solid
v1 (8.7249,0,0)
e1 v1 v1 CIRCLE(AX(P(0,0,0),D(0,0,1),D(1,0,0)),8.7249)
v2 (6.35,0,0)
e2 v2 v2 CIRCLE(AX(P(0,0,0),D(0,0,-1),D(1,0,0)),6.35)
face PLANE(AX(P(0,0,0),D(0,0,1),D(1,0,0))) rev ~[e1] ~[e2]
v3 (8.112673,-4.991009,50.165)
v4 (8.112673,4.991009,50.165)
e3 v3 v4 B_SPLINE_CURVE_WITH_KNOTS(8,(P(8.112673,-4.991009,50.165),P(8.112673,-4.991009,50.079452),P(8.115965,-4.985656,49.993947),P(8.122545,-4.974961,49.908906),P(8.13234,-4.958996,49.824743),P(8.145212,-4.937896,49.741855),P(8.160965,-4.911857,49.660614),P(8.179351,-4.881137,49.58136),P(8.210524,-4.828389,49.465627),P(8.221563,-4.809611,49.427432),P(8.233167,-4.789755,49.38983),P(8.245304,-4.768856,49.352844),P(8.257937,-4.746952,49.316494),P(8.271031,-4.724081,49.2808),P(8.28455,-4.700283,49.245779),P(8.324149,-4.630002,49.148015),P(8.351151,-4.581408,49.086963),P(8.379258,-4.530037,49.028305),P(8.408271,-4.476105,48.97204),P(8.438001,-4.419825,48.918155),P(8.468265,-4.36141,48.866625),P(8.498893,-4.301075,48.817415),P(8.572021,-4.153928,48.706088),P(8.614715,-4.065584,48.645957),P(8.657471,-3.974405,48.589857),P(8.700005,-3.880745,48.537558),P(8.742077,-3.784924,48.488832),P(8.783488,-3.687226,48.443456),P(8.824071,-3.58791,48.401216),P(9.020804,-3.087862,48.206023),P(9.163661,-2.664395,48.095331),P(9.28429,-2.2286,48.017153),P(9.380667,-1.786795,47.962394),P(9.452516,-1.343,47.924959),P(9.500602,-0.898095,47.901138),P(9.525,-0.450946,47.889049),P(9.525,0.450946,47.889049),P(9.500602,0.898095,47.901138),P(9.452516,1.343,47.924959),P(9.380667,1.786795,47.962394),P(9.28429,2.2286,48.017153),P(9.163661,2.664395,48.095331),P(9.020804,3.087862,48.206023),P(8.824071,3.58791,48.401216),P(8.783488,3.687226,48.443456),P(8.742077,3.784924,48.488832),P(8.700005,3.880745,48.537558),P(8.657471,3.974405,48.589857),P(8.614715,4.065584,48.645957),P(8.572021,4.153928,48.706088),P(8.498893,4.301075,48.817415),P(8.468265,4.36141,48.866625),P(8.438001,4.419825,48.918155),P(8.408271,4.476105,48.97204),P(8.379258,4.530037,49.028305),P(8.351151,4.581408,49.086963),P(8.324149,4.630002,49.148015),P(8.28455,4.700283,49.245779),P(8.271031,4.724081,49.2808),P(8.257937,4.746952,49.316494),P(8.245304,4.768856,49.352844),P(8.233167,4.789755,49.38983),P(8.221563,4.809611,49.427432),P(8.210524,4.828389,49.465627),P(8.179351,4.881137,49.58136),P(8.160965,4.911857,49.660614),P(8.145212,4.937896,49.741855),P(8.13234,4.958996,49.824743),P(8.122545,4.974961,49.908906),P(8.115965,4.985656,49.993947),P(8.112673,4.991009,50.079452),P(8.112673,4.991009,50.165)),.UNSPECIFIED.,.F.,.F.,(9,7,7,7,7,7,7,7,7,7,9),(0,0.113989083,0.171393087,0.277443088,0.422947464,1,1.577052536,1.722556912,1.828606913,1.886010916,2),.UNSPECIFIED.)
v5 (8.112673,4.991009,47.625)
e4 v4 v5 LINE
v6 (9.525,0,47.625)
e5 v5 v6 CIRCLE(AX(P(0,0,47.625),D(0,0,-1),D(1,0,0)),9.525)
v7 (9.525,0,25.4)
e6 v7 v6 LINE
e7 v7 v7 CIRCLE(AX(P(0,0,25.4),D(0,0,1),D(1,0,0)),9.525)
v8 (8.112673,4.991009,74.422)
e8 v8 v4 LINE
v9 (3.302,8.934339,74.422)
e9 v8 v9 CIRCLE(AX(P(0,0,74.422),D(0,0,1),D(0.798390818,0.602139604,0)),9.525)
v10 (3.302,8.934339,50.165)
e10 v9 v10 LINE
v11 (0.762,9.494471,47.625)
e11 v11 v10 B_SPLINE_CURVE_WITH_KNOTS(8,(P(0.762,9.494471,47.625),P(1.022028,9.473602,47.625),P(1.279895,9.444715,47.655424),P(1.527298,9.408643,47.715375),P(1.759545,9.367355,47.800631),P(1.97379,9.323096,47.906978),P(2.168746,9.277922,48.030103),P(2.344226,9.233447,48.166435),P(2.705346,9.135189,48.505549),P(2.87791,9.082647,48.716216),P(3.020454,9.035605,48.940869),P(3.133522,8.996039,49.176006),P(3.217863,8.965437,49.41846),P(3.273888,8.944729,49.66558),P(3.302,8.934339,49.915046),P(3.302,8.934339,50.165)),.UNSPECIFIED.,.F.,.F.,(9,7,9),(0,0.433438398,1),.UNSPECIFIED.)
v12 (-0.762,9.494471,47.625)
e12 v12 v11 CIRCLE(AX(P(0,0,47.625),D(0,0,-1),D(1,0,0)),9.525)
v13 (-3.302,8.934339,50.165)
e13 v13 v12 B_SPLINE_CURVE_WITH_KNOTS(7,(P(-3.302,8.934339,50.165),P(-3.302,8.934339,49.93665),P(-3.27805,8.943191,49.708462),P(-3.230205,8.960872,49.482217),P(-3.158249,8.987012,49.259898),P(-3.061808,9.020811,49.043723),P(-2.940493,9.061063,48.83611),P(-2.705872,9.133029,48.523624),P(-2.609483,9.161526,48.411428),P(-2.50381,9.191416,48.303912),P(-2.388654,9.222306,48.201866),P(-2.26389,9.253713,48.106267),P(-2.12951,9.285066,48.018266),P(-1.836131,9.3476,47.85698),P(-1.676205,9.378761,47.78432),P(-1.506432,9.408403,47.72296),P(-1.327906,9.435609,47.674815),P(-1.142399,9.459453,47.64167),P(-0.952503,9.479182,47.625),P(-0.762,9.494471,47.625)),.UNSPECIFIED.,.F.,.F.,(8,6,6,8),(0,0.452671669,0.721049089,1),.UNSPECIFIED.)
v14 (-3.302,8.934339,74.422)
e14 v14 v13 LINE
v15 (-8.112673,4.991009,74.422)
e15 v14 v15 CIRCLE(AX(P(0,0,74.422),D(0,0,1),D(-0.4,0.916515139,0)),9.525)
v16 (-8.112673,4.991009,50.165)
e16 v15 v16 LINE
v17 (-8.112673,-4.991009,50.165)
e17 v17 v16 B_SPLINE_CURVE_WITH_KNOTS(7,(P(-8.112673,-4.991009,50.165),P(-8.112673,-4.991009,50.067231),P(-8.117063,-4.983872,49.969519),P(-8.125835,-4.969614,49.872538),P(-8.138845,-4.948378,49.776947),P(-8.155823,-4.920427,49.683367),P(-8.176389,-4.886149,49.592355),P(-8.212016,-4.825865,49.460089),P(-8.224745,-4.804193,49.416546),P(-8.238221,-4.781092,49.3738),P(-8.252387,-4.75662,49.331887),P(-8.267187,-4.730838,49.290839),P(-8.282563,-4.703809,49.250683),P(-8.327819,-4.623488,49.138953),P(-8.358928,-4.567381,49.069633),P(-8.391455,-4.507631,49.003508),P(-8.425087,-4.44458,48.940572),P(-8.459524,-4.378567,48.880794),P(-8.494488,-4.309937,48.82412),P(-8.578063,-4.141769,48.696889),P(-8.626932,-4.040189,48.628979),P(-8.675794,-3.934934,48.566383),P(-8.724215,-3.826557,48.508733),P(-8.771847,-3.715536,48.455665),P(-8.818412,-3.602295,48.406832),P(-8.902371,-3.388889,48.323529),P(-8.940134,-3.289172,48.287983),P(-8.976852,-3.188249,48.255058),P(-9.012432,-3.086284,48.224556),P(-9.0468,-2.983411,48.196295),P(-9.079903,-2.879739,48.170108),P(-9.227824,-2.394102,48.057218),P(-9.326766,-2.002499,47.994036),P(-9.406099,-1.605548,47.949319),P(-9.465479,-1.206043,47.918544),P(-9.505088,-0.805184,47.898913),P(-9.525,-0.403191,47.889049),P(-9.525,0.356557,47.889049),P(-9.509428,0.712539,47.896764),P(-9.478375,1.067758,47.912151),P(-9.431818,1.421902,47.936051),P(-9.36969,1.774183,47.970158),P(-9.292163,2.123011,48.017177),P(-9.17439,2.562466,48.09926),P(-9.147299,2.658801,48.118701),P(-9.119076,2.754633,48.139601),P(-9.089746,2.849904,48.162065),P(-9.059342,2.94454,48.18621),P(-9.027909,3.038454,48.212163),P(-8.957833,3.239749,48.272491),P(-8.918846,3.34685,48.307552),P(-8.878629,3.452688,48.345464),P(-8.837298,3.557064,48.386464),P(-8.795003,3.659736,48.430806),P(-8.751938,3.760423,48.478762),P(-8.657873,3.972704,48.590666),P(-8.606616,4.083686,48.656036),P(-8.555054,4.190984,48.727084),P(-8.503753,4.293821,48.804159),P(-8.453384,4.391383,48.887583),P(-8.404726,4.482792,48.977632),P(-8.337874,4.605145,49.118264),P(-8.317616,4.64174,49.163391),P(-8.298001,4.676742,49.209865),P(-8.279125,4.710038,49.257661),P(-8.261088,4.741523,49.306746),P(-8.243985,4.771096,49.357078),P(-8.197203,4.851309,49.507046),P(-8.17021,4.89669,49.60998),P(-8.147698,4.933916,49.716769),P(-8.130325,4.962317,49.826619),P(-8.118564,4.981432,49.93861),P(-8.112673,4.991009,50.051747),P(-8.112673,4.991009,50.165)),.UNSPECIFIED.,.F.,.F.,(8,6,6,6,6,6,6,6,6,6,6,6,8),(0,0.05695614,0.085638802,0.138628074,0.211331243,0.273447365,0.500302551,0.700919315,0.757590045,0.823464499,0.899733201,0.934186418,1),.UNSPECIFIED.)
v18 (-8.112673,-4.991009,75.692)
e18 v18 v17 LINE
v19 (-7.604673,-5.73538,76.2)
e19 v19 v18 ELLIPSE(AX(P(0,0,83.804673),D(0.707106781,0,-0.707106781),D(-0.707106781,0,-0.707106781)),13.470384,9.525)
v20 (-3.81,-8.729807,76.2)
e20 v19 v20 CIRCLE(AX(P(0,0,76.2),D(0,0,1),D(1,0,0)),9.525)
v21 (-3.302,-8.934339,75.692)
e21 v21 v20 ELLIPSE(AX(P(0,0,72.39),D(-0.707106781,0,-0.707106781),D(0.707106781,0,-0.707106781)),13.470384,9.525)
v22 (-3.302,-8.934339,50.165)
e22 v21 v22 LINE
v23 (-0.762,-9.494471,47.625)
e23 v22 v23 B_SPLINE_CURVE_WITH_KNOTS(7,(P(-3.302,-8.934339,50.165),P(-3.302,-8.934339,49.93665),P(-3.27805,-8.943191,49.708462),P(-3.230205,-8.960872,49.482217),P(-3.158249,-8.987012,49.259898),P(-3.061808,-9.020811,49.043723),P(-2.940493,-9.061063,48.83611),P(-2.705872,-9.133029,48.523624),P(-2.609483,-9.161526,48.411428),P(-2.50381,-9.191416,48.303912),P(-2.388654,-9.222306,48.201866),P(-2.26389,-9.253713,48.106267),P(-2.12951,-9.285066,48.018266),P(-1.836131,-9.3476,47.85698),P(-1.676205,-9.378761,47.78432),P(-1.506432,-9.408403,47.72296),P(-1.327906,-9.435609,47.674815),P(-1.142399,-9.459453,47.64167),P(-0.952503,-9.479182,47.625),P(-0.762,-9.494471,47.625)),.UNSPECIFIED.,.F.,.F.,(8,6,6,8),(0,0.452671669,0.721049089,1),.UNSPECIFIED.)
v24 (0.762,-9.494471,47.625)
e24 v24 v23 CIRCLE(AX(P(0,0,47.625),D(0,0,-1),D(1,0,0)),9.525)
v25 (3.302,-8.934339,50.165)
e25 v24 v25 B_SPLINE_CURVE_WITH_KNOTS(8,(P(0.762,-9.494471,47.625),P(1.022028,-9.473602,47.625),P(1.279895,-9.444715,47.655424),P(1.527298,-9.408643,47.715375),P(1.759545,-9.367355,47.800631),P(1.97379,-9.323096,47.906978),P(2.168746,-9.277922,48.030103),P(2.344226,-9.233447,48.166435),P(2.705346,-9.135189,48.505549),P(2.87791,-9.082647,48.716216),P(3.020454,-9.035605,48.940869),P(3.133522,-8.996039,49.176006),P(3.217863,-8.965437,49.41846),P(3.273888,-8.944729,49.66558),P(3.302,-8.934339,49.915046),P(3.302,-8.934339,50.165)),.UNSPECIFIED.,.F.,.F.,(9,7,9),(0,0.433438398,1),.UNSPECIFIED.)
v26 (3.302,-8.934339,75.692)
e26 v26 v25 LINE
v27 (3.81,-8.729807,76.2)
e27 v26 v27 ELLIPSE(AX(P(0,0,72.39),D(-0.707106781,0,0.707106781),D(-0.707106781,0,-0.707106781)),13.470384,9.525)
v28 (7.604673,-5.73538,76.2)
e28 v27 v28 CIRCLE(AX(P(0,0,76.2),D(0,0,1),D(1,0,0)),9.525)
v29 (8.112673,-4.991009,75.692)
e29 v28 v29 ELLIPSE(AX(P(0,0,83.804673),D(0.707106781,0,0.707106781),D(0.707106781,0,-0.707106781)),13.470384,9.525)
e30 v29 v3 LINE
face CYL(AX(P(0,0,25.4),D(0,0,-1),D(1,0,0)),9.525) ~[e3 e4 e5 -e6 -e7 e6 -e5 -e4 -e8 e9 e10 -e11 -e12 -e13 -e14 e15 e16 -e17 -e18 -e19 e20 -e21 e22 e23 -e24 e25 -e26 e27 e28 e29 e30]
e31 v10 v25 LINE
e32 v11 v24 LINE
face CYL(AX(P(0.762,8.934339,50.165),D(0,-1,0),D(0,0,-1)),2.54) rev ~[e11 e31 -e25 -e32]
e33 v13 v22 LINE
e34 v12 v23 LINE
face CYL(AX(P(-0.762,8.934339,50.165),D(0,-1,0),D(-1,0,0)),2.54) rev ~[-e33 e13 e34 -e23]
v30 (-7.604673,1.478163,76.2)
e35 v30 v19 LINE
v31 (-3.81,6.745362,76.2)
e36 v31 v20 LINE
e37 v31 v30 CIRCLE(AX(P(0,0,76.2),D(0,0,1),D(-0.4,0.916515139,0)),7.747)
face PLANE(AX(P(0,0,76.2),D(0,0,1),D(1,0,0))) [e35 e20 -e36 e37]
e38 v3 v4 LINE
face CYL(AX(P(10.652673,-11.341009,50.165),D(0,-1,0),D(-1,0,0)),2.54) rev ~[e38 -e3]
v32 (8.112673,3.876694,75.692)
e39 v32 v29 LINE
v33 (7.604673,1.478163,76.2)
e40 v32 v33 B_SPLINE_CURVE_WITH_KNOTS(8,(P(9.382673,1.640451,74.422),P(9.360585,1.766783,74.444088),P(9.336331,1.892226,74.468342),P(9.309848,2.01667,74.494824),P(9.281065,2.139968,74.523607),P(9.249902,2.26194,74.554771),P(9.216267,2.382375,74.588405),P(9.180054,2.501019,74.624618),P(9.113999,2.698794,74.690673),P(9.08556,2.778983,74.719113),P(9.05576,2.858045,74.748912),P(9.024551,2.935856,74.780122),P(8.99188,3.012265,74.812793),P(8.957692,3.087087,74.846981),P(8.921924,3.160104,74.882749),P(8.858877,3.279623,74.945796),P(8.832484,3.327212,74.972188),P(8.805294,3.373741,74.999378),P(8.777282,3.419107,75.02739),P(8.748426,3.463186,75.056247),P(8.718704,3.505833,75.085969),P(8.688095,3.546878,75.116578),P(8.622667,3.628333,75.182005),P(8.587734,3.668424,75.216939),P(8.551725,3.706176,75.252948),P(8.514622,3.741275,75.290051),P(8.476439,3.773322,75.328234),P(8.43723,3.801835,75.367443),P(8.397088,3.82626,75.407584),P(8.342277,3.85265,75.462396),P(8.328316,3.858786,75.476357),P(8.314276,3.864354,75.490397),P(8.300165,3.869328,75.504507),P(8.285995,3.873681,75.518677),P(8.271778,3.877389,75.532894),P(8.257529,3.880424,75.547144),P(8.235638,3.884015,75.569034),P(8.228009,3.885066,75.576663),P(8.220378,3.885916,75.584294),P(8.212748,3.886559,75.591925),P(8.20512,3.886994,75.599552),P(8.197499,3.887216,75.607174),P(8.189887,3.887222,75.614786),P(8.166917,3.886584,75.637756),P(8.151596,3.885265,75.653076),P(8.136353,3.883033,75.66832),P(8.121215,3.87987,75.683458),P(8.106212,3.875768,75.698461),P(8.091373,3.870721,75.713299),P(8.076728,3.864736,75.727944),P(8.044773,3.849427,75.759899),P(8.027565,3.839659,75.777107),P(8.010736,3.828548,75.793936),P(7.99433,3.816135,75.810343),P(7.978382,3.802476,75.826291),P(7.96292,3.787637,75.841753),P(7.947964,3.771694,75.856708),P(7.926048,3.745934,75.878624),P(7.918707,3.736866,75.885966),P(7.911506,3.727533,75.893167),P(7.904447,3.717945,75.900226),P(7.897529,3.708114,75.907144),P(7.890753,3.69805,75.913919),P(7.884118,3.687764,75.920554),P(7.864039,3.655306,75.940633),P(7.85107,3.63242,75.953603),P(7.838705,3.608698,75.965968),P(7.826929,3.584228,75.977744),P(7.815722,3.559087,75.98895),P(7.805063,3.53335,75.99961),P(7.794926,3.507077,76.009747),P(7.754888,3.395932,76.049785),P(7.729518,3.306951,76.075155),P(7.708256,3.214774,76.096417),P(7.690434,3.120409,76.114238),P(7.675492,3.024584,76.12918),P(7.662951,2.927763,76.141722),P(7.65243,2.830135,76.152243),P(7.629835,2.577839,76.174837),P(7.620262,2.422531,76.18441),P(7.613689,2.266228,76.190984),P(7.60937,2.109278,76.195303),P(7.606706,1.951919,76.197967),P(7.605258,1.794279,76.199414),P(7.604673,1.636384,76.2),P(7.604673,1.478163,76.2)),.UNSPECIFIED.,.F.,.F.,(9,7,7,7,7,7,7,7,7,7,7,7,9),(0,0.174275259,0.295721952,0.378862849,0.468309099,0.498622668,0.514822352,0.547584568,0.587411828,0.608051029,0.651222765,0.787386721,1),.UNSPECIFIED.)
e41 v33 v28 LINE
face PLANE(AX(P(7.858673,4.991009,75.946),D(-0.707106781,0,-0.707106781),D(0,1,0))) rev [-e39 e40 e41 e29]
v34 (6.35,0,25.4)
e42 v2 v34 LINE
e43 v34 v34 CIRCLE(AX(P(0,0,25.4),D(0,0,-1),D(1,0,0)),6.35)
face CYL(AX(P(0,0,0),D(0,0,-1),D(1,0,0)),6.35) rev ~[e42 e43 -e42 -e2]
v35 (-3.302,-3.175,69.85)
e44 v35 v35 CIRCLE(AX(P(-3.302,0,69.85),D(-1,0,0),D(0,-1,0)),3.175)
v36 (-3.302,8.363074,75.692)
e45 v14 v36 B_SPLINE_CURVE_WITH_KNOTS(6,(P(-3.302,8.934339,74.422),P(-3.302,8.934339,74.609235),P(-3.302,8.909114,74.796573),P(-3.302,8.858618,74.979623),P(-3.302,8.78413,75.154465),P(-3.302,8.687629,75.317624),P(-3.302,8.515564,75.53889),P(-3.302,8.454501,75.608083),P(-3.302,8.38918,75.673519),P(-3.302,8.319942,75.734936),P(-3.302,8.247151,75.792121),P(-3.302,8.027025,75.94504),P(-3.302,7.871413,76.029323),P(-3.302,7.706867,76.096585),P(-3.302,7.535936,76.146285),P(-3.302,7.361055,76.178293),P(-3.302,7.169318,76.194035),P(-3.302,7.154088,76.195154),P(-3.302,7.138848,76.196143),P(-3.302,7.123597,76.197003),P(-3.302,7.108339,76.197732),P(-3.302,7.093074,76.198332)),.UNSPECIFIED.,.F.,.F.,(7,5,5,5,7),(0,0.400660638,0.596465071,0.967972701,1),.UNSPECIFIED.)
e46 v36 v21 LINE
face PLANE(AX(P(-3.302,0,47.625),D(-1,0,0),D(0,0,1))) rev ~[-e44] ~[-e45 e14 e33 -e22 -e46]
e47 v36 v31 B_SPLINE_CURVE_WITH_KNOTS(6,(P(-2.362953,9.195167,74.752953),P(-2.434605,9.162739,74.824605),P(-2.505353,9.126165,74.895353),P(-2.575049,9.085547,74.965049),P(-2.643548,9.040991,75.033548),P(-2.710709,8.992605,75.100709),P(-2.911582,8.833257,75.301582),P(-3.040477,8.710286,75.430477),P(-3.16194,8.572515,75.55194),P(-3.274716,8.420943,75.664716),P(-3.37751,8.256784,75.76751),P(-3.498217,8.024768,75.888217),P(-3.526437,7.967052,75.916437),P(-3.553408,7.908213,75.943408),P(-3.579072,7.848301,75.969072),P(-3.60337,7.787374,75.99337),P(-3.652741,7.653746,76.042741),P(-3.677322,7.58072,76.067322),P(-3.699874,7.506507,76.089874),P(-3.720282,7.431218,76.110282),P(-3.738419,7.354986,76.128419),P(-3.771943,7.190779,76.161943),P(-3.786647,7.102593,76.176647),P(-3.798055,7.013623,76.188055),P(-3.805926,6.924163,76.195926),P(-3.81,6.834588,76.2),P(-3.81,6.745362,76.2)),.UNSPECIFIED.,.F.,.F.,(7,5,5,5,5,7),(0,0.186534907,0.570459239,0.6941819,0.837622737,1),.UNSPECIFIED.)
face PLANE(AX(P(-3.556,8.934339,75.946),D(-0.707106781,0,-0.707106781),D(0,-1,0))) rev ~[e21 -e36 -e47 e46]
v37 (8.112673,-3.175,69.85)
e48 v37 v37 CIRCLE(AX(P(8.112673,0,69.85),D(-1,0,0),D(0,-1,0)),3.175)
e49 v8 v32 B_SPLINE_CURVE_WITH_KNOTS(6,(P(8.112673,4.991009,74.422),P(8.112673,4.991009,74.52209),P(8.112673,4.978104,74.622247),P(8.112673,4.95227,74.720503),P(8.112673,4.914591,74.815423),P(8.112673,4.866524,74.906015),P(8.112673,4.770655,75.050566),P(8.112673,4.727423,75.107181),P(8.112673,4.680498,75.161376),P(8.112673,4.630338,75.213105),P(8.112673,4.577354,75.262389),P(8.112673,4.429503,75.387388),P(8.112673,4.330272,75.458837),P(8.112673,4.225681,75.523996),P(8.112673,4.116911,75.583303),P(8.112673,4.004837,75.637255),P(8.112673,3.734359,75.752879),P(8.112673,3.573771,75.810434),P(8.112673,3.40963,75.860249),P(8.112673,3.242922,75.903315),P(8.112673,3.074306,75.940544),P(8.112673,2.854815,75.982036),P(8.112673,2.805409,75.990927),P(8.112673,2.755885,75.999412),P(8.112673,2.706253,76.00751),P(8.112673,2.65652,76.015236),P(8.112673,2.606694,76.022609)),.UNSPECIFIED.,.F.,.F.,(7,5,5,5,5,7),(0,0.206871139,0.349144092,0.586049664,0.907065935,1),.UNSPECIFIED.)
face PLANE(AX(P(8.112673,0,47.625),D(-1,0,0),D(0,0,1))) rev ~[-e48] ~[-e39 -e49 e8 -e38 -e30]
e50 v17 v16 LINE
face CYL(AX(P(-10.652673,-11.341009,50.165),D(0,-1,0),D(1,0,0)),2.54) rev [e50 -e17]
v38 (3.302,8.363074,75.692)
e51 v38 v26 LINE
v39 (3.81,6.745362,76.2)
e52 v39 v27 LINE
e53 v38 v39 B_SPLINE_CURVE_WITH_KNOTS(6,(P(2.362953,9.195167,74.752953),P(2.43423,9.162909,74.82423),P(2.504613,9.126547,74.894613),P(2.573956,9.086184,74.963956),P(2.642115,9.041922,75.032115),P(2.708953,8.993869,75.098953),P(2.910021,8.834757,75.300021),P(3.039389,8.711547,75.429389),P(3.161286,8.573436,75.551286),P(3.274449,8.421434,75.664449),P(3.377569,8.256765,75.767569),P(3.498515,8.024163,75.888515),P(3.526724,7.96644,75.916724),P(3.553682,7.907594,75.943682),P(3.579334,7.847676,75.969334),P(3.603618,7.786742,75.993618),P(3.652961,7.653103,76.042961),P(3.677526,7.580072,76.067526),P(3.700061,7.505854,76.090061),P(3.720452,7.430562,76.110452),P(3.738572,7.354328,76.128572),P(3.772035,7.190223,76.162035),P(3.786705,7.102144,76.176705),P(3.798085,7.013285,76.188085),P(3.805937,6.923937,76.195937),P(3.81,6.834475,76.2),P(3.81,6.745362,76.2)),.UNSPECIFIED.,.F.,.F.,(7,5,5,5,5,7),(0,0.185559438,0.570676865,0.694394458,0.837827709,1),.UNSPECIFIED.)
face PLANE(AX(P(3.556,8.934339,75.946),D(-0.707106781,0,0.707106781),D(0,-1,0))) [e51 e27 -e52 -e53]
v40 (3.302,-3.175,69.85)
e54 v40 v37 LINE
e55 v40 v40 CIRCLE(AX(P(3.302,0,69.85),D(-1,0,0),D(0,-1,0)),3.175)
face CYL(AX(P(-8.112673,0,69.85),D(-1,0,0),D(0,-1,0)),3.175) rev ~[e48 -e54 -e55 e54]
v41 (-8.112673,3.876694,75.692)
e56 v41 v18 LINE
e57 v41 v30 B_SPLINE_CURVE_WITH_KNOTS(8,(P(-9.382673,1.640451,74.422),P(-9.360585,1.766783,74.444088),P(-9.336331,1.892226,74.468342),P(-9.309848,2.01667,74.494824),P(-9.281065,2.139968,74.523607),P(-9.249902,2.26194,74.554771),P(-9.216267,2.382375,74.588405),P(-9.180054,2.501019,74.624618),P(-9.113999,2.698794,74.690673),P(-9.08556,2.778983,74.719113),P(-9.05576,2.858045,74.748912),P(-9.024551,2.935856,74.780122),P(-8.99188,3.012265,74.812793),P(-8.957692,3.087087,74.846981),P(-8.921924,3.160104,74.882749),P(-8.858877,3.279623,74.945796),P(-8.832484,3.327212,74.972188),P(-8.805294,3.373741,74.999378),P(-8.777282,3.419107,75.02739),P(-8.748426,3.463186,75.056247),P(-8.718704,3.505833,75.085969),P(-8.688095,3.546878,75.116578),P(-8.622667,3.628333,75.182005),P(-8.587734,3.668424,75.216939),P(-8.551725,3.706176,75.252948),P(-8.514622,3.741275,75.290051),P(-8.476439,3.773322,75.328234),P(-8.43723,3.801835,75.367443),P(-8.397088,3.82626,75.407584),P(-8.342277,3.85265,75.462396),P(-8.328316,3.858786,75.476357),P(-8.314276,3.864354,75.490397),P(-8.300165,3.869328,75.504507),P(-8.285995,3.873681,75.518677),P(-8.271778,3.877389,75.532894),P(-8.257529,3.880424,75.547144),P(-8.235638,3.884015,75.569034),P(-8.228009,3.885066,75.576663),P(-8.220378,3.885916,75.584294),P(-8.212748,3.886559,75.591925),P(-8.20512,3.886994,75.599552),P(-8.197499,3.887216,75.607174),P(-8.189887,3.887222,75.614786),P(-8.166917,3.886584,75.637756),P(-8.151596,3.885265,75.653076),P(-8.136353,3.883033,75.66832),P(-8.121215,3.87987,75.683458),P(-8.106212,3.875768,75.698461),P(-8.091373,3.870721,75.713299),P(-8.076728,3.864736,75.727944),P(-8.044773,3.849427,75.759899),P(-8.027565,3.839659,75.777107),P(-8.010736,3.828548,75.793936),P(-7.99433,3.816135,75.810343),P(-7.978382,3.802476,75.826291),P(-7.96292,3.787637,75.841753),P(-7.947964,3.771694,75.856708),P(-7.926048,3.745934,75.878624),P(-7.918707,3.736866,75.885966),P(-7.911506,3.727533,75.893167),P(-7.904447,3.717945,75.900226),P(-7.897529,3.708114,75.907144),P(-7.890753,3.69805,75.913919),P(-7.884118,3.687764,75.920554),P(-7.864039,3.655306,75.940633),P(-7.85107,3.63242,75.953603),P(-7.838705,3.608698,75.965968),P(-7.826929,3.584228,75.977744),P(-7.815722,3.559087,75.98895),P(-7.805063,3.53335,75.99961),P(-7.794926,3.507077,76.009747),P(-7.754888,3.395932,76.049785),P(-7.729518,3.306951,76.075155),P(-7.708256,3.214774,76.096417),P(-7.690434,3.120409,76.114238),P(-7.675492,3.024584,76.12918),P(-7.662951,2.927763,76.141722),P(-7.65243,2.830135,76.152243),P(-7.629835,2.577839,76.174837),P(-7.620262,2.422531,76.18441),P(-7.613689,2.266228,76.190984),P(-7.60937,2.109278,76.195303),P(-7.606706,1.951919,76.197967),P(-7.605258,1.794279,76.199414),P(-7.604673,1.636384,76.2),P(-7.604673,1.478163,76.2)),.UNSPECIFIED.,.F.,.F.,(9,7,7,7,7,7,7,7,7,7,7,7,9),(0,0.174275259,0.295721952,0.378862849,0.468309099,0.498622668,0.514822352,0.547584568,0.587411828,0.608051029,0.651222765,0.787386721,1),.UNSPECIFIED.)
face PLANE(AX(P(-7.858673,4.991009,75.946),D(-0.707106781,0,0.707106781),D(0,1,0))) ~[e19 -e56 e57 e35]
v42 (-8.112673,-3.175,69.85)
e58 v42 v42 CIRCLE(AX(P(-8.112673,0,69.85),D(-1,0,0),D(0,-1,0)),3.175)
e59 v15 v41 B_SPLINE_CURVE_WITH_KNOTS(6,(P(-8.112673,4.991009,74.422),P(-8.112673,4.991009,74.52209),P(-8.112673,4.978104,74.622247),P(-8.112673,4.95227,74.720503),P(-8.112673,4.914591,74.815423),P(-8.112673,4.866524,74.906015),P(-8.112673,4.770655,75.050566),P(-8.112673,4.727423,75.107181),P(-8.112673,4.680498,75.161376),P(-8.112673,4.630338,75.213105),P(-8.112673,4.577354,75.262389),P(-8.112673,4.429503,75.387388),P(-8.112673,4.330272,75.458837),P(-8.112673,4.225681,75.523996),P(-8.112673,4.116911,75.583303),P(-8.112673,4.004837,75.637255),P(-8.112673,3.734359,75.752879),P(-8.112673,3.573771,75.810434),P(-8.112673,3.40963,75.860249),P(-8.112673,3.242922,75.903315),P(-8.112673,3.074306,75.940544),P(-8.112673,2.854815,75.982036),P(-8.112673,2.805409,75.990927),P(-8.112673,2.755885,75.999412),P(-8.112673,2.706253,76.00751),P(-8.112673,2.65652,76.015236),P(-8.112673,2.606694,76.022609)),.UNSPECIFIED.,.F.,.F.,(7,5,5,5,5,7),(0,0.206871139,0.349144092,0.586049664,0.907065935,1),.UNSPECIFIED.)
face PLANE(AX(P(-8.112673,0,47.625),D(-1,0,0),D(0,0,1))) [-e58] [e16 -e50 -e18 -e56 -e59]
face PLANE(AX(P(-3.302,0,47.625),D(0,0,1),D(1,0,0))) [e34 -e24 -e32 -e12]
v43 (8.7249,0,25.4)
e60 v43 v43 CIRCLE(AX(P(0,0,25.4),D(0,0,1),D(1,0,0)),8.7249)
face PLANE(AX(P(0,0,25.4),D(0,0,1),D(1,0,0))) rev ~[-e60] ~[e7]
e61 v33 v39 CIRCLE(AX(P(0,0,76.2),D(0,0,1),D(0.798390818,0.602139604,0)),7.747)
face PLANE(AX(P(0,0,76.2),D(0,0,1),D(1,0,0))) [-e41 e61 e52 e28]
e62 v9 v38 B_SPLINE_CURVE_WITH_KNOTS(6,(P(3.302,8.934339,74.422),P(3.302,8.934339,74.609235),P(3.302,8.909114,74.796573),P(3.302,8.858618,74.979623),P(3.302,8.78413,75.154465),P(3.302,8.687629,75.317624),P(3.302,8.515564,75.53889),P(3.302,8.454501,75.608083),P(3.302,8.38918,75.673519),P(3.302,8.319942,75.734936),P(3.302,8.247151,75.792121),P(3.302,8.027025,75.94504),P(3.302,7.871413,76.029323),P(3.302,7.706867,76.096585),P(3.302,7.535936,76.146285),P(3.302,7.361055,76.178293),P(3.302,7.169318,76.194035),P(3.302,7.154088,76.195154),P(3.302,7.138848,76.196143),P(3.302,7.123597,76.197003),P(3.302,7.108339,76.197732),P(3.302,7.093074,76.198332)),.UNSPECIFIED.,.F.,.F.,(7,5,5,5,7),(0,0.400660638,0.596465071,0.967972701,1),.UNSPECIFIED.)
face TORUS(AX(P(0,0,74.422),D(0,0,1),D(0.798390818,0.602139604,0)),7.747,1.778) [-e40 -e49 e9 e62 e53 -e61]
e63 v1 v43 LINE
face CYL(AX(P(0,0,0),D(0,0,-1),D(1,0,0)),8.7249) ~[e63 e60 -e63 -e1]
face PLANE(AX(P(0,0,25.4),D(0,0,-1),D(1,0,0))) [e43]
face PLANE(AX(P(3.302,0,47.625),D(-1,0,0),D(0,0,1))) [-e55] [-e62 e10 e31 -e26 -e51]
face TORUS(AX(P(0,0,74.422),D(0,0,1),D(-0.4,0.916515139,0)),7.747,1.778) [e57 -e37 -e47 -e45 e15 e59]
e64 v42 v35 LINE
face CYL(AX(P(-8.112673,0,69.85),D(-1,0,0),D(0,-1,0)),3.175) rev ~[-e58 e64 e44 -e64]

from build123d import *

# Parameters (mm, degrees)
F0_R           = 8.7249
F1_DEPTH       = 25.4
F2_R           = 9.525
F3_DEPTH       = 50.8
F4_W           = 6.604
F4_H           = 31.75
F4_W_2         = 7.7840778498
F4_H_2         = 37.4901928008
F5_DEPTH       = 25.4
F5_DEPTH_BACK  = 25.4
F6_R           = 2.54
F7_SIZE        = 0.508
F8_T4_DEPTH    = 22.6820176921
F8_S5_R        = 9.525
F8_T6_DEPTH    = 13
F8_T10_DEPTH   = 22.6820176921
F8_S11_R       = 9.525
F8_T12_DEPTH   = 13
F9_R           = 3.175
F10_DEPTH      = 25.4
F10_DEPTH_BACK = 25.4
F11_R          = 1.778
F12_R          = 6.35
F13_DEPTH      = 25.4


# Not quite as in the source:
# - a fillet or chamfer that OpenCascade refuses, or shapes differently, is made with other operations: its cross-section is extruded or revolved along the edge and cut away or added


with BuildPart() as f1:
    # F0 (on Top) → F1 (new body)
    with BuildSketch(Plane.XY):
        Circle(F0_R)
    extrude(amount=F1_DEPTH)

    # F2 (on face) → F3 (join)
    with BuildSketch(Plane.XY.offset(25.4)):
        Circle(F2_R)
    extrude(amount=F3_DEPTH)

    # F4 (on Front) → F5 (cut, two sides)
    with BuildSketch(Plane.XZ) as f5_sk:
        with Locations((0, 63.5)):
            Rectangle(F4_W, F4_H)
        with Locations((12.0047114623, 66.3700964004)):
            Rectangle(F4_W_2, F4_H_2)
        with Locations((-12.0047114623, 66.3700964004)):
            Rectangle(F4_W_2, F4_H_2)
    extrude(amount=-F5_DEPTH, mode=Mode.SUBTRACT)
    extrude(f5_sk.sketch, amount=F5_DEPTH_BACK, mode=Mode.SUBTRACT)

    # F6
    f6_edges = [f1.edges().sort_by_distance(p)[0] for p in [
        (-3.302, 0, 47.625),
        (3.302, 0, 47.625),
    ]]
    fillet(f6_edges, radius=F6_R)

    # F7
    f7_edges = [f1.edges().sort_by_distance(p)[0] for p in [
        (3.302, 0, 76.2),
        (-3.302, 0, 76.2),
        (-8.112673, 0, 76.2),
        (8.112673, 0, 76.2),
    ]]
    chamfer(f7_edges, length=F7_SIZE)

    # F8: fillet of radius 2.54 on 2 edges, made by hand


with BuildPart() as f8_tool2:
    # F8_s3 → F8_t4 (new body)
    with BuildSketch(Plane.XZ.offset(11.341008846)):
        with BuildLine():
            ThreePointArc((8.1126725374, 50.165), (8.8566213132, 48.3689487758), (10.6526725374, 47.625))
            Line((10.6526725374, 47.625), (8.1126725374, 47.625))
            Line((8.1126725374, 47.625), (8.1126725374, 50.165))
        make_face()
    extrude(amount=-F8_T4_DEPTH)

    # F8_s5 → F8_t6 (intersect, symmetric)
    with BuildSketch(Plane.XY.offset(48.9)):
        Circle(F8_S5_R)
    extrude(amount=F8_T6_DEPTH, both=True, mode=Mode.INTERSECT)


with BuildPart() as f1_1:
    add(f1.part)

    # F8_t1: union F8_tool2
    add(f8_tool2.part)


with BuildPart() as f8_tool8:
    # F8_s9 → F8_t10 (new body)
    with BuildSketch(Plane.XZ.offset(11.341008846)):
        with BuildLine():
            ThreePointArc((-8.1126725374, 50.165), (-8.8566213132, 48.3689487758), (-10.6526725374, 47.625))
            Line((-10.6526725374, 47.625), (-8.1126725374, 47.625))
            Line((-8.1126725374, 47.625), (-8.1126725374, 50.165))
        make_face()
    extrude(amount=-F8_T10_DEPTH)

    # F8_s11 → F8_t12 (intersect, symmetric)
    with BuildSketch(Plane.XY.offset(48.9)):
        Circle(F8_S11_R)
    extrude(amount=F8_T12_DEPTH, both=True, mode=Mode.INTERSECT)


with BuildPart() as f1_2:
    add(f1_1.part)

    # F8_t7: union F8_tool8
    add(f8_tool8.part)

    # F9 (on face) → F10 (cut, two sides)
    with BuildSketch(Plane(origin=(-8.1126725374, 0, 0), x_dir=(0, -1, 0), z_dir=(-1, 0, 0))) as f10_sk:
        with Locations((0, 69.85)):
            Circle(F9_R)
    extrude(amount=-F10_DEPTH, mode=Mode.SUBTRACT)
    extrude(f10_sk.sketch, amount=F10_DEPTH_BACK, mode=Mode.SUBTRACT)

    # F11
    f11_edges = [f1_2.edges().sort_by_distance(p)[0] for p in [
        (-5.900452, 7.477318, 76.2),
        (5.900452, 7.477318, 76.2),
    ]]
    fillet(f11_edges, radius=F11_R)

    # F12 (on face) → F13 (cut)
    with BuildSketch(Plane(origin=(0, 0, 0), x_dir=(1, 0, 0), z_dir=(0, 0, -1))):
        Circle(F12_R)
    extrude(amount=-F13_DEPTH, mode=Mode.SUBTRACT)


solid = f1_2.part
